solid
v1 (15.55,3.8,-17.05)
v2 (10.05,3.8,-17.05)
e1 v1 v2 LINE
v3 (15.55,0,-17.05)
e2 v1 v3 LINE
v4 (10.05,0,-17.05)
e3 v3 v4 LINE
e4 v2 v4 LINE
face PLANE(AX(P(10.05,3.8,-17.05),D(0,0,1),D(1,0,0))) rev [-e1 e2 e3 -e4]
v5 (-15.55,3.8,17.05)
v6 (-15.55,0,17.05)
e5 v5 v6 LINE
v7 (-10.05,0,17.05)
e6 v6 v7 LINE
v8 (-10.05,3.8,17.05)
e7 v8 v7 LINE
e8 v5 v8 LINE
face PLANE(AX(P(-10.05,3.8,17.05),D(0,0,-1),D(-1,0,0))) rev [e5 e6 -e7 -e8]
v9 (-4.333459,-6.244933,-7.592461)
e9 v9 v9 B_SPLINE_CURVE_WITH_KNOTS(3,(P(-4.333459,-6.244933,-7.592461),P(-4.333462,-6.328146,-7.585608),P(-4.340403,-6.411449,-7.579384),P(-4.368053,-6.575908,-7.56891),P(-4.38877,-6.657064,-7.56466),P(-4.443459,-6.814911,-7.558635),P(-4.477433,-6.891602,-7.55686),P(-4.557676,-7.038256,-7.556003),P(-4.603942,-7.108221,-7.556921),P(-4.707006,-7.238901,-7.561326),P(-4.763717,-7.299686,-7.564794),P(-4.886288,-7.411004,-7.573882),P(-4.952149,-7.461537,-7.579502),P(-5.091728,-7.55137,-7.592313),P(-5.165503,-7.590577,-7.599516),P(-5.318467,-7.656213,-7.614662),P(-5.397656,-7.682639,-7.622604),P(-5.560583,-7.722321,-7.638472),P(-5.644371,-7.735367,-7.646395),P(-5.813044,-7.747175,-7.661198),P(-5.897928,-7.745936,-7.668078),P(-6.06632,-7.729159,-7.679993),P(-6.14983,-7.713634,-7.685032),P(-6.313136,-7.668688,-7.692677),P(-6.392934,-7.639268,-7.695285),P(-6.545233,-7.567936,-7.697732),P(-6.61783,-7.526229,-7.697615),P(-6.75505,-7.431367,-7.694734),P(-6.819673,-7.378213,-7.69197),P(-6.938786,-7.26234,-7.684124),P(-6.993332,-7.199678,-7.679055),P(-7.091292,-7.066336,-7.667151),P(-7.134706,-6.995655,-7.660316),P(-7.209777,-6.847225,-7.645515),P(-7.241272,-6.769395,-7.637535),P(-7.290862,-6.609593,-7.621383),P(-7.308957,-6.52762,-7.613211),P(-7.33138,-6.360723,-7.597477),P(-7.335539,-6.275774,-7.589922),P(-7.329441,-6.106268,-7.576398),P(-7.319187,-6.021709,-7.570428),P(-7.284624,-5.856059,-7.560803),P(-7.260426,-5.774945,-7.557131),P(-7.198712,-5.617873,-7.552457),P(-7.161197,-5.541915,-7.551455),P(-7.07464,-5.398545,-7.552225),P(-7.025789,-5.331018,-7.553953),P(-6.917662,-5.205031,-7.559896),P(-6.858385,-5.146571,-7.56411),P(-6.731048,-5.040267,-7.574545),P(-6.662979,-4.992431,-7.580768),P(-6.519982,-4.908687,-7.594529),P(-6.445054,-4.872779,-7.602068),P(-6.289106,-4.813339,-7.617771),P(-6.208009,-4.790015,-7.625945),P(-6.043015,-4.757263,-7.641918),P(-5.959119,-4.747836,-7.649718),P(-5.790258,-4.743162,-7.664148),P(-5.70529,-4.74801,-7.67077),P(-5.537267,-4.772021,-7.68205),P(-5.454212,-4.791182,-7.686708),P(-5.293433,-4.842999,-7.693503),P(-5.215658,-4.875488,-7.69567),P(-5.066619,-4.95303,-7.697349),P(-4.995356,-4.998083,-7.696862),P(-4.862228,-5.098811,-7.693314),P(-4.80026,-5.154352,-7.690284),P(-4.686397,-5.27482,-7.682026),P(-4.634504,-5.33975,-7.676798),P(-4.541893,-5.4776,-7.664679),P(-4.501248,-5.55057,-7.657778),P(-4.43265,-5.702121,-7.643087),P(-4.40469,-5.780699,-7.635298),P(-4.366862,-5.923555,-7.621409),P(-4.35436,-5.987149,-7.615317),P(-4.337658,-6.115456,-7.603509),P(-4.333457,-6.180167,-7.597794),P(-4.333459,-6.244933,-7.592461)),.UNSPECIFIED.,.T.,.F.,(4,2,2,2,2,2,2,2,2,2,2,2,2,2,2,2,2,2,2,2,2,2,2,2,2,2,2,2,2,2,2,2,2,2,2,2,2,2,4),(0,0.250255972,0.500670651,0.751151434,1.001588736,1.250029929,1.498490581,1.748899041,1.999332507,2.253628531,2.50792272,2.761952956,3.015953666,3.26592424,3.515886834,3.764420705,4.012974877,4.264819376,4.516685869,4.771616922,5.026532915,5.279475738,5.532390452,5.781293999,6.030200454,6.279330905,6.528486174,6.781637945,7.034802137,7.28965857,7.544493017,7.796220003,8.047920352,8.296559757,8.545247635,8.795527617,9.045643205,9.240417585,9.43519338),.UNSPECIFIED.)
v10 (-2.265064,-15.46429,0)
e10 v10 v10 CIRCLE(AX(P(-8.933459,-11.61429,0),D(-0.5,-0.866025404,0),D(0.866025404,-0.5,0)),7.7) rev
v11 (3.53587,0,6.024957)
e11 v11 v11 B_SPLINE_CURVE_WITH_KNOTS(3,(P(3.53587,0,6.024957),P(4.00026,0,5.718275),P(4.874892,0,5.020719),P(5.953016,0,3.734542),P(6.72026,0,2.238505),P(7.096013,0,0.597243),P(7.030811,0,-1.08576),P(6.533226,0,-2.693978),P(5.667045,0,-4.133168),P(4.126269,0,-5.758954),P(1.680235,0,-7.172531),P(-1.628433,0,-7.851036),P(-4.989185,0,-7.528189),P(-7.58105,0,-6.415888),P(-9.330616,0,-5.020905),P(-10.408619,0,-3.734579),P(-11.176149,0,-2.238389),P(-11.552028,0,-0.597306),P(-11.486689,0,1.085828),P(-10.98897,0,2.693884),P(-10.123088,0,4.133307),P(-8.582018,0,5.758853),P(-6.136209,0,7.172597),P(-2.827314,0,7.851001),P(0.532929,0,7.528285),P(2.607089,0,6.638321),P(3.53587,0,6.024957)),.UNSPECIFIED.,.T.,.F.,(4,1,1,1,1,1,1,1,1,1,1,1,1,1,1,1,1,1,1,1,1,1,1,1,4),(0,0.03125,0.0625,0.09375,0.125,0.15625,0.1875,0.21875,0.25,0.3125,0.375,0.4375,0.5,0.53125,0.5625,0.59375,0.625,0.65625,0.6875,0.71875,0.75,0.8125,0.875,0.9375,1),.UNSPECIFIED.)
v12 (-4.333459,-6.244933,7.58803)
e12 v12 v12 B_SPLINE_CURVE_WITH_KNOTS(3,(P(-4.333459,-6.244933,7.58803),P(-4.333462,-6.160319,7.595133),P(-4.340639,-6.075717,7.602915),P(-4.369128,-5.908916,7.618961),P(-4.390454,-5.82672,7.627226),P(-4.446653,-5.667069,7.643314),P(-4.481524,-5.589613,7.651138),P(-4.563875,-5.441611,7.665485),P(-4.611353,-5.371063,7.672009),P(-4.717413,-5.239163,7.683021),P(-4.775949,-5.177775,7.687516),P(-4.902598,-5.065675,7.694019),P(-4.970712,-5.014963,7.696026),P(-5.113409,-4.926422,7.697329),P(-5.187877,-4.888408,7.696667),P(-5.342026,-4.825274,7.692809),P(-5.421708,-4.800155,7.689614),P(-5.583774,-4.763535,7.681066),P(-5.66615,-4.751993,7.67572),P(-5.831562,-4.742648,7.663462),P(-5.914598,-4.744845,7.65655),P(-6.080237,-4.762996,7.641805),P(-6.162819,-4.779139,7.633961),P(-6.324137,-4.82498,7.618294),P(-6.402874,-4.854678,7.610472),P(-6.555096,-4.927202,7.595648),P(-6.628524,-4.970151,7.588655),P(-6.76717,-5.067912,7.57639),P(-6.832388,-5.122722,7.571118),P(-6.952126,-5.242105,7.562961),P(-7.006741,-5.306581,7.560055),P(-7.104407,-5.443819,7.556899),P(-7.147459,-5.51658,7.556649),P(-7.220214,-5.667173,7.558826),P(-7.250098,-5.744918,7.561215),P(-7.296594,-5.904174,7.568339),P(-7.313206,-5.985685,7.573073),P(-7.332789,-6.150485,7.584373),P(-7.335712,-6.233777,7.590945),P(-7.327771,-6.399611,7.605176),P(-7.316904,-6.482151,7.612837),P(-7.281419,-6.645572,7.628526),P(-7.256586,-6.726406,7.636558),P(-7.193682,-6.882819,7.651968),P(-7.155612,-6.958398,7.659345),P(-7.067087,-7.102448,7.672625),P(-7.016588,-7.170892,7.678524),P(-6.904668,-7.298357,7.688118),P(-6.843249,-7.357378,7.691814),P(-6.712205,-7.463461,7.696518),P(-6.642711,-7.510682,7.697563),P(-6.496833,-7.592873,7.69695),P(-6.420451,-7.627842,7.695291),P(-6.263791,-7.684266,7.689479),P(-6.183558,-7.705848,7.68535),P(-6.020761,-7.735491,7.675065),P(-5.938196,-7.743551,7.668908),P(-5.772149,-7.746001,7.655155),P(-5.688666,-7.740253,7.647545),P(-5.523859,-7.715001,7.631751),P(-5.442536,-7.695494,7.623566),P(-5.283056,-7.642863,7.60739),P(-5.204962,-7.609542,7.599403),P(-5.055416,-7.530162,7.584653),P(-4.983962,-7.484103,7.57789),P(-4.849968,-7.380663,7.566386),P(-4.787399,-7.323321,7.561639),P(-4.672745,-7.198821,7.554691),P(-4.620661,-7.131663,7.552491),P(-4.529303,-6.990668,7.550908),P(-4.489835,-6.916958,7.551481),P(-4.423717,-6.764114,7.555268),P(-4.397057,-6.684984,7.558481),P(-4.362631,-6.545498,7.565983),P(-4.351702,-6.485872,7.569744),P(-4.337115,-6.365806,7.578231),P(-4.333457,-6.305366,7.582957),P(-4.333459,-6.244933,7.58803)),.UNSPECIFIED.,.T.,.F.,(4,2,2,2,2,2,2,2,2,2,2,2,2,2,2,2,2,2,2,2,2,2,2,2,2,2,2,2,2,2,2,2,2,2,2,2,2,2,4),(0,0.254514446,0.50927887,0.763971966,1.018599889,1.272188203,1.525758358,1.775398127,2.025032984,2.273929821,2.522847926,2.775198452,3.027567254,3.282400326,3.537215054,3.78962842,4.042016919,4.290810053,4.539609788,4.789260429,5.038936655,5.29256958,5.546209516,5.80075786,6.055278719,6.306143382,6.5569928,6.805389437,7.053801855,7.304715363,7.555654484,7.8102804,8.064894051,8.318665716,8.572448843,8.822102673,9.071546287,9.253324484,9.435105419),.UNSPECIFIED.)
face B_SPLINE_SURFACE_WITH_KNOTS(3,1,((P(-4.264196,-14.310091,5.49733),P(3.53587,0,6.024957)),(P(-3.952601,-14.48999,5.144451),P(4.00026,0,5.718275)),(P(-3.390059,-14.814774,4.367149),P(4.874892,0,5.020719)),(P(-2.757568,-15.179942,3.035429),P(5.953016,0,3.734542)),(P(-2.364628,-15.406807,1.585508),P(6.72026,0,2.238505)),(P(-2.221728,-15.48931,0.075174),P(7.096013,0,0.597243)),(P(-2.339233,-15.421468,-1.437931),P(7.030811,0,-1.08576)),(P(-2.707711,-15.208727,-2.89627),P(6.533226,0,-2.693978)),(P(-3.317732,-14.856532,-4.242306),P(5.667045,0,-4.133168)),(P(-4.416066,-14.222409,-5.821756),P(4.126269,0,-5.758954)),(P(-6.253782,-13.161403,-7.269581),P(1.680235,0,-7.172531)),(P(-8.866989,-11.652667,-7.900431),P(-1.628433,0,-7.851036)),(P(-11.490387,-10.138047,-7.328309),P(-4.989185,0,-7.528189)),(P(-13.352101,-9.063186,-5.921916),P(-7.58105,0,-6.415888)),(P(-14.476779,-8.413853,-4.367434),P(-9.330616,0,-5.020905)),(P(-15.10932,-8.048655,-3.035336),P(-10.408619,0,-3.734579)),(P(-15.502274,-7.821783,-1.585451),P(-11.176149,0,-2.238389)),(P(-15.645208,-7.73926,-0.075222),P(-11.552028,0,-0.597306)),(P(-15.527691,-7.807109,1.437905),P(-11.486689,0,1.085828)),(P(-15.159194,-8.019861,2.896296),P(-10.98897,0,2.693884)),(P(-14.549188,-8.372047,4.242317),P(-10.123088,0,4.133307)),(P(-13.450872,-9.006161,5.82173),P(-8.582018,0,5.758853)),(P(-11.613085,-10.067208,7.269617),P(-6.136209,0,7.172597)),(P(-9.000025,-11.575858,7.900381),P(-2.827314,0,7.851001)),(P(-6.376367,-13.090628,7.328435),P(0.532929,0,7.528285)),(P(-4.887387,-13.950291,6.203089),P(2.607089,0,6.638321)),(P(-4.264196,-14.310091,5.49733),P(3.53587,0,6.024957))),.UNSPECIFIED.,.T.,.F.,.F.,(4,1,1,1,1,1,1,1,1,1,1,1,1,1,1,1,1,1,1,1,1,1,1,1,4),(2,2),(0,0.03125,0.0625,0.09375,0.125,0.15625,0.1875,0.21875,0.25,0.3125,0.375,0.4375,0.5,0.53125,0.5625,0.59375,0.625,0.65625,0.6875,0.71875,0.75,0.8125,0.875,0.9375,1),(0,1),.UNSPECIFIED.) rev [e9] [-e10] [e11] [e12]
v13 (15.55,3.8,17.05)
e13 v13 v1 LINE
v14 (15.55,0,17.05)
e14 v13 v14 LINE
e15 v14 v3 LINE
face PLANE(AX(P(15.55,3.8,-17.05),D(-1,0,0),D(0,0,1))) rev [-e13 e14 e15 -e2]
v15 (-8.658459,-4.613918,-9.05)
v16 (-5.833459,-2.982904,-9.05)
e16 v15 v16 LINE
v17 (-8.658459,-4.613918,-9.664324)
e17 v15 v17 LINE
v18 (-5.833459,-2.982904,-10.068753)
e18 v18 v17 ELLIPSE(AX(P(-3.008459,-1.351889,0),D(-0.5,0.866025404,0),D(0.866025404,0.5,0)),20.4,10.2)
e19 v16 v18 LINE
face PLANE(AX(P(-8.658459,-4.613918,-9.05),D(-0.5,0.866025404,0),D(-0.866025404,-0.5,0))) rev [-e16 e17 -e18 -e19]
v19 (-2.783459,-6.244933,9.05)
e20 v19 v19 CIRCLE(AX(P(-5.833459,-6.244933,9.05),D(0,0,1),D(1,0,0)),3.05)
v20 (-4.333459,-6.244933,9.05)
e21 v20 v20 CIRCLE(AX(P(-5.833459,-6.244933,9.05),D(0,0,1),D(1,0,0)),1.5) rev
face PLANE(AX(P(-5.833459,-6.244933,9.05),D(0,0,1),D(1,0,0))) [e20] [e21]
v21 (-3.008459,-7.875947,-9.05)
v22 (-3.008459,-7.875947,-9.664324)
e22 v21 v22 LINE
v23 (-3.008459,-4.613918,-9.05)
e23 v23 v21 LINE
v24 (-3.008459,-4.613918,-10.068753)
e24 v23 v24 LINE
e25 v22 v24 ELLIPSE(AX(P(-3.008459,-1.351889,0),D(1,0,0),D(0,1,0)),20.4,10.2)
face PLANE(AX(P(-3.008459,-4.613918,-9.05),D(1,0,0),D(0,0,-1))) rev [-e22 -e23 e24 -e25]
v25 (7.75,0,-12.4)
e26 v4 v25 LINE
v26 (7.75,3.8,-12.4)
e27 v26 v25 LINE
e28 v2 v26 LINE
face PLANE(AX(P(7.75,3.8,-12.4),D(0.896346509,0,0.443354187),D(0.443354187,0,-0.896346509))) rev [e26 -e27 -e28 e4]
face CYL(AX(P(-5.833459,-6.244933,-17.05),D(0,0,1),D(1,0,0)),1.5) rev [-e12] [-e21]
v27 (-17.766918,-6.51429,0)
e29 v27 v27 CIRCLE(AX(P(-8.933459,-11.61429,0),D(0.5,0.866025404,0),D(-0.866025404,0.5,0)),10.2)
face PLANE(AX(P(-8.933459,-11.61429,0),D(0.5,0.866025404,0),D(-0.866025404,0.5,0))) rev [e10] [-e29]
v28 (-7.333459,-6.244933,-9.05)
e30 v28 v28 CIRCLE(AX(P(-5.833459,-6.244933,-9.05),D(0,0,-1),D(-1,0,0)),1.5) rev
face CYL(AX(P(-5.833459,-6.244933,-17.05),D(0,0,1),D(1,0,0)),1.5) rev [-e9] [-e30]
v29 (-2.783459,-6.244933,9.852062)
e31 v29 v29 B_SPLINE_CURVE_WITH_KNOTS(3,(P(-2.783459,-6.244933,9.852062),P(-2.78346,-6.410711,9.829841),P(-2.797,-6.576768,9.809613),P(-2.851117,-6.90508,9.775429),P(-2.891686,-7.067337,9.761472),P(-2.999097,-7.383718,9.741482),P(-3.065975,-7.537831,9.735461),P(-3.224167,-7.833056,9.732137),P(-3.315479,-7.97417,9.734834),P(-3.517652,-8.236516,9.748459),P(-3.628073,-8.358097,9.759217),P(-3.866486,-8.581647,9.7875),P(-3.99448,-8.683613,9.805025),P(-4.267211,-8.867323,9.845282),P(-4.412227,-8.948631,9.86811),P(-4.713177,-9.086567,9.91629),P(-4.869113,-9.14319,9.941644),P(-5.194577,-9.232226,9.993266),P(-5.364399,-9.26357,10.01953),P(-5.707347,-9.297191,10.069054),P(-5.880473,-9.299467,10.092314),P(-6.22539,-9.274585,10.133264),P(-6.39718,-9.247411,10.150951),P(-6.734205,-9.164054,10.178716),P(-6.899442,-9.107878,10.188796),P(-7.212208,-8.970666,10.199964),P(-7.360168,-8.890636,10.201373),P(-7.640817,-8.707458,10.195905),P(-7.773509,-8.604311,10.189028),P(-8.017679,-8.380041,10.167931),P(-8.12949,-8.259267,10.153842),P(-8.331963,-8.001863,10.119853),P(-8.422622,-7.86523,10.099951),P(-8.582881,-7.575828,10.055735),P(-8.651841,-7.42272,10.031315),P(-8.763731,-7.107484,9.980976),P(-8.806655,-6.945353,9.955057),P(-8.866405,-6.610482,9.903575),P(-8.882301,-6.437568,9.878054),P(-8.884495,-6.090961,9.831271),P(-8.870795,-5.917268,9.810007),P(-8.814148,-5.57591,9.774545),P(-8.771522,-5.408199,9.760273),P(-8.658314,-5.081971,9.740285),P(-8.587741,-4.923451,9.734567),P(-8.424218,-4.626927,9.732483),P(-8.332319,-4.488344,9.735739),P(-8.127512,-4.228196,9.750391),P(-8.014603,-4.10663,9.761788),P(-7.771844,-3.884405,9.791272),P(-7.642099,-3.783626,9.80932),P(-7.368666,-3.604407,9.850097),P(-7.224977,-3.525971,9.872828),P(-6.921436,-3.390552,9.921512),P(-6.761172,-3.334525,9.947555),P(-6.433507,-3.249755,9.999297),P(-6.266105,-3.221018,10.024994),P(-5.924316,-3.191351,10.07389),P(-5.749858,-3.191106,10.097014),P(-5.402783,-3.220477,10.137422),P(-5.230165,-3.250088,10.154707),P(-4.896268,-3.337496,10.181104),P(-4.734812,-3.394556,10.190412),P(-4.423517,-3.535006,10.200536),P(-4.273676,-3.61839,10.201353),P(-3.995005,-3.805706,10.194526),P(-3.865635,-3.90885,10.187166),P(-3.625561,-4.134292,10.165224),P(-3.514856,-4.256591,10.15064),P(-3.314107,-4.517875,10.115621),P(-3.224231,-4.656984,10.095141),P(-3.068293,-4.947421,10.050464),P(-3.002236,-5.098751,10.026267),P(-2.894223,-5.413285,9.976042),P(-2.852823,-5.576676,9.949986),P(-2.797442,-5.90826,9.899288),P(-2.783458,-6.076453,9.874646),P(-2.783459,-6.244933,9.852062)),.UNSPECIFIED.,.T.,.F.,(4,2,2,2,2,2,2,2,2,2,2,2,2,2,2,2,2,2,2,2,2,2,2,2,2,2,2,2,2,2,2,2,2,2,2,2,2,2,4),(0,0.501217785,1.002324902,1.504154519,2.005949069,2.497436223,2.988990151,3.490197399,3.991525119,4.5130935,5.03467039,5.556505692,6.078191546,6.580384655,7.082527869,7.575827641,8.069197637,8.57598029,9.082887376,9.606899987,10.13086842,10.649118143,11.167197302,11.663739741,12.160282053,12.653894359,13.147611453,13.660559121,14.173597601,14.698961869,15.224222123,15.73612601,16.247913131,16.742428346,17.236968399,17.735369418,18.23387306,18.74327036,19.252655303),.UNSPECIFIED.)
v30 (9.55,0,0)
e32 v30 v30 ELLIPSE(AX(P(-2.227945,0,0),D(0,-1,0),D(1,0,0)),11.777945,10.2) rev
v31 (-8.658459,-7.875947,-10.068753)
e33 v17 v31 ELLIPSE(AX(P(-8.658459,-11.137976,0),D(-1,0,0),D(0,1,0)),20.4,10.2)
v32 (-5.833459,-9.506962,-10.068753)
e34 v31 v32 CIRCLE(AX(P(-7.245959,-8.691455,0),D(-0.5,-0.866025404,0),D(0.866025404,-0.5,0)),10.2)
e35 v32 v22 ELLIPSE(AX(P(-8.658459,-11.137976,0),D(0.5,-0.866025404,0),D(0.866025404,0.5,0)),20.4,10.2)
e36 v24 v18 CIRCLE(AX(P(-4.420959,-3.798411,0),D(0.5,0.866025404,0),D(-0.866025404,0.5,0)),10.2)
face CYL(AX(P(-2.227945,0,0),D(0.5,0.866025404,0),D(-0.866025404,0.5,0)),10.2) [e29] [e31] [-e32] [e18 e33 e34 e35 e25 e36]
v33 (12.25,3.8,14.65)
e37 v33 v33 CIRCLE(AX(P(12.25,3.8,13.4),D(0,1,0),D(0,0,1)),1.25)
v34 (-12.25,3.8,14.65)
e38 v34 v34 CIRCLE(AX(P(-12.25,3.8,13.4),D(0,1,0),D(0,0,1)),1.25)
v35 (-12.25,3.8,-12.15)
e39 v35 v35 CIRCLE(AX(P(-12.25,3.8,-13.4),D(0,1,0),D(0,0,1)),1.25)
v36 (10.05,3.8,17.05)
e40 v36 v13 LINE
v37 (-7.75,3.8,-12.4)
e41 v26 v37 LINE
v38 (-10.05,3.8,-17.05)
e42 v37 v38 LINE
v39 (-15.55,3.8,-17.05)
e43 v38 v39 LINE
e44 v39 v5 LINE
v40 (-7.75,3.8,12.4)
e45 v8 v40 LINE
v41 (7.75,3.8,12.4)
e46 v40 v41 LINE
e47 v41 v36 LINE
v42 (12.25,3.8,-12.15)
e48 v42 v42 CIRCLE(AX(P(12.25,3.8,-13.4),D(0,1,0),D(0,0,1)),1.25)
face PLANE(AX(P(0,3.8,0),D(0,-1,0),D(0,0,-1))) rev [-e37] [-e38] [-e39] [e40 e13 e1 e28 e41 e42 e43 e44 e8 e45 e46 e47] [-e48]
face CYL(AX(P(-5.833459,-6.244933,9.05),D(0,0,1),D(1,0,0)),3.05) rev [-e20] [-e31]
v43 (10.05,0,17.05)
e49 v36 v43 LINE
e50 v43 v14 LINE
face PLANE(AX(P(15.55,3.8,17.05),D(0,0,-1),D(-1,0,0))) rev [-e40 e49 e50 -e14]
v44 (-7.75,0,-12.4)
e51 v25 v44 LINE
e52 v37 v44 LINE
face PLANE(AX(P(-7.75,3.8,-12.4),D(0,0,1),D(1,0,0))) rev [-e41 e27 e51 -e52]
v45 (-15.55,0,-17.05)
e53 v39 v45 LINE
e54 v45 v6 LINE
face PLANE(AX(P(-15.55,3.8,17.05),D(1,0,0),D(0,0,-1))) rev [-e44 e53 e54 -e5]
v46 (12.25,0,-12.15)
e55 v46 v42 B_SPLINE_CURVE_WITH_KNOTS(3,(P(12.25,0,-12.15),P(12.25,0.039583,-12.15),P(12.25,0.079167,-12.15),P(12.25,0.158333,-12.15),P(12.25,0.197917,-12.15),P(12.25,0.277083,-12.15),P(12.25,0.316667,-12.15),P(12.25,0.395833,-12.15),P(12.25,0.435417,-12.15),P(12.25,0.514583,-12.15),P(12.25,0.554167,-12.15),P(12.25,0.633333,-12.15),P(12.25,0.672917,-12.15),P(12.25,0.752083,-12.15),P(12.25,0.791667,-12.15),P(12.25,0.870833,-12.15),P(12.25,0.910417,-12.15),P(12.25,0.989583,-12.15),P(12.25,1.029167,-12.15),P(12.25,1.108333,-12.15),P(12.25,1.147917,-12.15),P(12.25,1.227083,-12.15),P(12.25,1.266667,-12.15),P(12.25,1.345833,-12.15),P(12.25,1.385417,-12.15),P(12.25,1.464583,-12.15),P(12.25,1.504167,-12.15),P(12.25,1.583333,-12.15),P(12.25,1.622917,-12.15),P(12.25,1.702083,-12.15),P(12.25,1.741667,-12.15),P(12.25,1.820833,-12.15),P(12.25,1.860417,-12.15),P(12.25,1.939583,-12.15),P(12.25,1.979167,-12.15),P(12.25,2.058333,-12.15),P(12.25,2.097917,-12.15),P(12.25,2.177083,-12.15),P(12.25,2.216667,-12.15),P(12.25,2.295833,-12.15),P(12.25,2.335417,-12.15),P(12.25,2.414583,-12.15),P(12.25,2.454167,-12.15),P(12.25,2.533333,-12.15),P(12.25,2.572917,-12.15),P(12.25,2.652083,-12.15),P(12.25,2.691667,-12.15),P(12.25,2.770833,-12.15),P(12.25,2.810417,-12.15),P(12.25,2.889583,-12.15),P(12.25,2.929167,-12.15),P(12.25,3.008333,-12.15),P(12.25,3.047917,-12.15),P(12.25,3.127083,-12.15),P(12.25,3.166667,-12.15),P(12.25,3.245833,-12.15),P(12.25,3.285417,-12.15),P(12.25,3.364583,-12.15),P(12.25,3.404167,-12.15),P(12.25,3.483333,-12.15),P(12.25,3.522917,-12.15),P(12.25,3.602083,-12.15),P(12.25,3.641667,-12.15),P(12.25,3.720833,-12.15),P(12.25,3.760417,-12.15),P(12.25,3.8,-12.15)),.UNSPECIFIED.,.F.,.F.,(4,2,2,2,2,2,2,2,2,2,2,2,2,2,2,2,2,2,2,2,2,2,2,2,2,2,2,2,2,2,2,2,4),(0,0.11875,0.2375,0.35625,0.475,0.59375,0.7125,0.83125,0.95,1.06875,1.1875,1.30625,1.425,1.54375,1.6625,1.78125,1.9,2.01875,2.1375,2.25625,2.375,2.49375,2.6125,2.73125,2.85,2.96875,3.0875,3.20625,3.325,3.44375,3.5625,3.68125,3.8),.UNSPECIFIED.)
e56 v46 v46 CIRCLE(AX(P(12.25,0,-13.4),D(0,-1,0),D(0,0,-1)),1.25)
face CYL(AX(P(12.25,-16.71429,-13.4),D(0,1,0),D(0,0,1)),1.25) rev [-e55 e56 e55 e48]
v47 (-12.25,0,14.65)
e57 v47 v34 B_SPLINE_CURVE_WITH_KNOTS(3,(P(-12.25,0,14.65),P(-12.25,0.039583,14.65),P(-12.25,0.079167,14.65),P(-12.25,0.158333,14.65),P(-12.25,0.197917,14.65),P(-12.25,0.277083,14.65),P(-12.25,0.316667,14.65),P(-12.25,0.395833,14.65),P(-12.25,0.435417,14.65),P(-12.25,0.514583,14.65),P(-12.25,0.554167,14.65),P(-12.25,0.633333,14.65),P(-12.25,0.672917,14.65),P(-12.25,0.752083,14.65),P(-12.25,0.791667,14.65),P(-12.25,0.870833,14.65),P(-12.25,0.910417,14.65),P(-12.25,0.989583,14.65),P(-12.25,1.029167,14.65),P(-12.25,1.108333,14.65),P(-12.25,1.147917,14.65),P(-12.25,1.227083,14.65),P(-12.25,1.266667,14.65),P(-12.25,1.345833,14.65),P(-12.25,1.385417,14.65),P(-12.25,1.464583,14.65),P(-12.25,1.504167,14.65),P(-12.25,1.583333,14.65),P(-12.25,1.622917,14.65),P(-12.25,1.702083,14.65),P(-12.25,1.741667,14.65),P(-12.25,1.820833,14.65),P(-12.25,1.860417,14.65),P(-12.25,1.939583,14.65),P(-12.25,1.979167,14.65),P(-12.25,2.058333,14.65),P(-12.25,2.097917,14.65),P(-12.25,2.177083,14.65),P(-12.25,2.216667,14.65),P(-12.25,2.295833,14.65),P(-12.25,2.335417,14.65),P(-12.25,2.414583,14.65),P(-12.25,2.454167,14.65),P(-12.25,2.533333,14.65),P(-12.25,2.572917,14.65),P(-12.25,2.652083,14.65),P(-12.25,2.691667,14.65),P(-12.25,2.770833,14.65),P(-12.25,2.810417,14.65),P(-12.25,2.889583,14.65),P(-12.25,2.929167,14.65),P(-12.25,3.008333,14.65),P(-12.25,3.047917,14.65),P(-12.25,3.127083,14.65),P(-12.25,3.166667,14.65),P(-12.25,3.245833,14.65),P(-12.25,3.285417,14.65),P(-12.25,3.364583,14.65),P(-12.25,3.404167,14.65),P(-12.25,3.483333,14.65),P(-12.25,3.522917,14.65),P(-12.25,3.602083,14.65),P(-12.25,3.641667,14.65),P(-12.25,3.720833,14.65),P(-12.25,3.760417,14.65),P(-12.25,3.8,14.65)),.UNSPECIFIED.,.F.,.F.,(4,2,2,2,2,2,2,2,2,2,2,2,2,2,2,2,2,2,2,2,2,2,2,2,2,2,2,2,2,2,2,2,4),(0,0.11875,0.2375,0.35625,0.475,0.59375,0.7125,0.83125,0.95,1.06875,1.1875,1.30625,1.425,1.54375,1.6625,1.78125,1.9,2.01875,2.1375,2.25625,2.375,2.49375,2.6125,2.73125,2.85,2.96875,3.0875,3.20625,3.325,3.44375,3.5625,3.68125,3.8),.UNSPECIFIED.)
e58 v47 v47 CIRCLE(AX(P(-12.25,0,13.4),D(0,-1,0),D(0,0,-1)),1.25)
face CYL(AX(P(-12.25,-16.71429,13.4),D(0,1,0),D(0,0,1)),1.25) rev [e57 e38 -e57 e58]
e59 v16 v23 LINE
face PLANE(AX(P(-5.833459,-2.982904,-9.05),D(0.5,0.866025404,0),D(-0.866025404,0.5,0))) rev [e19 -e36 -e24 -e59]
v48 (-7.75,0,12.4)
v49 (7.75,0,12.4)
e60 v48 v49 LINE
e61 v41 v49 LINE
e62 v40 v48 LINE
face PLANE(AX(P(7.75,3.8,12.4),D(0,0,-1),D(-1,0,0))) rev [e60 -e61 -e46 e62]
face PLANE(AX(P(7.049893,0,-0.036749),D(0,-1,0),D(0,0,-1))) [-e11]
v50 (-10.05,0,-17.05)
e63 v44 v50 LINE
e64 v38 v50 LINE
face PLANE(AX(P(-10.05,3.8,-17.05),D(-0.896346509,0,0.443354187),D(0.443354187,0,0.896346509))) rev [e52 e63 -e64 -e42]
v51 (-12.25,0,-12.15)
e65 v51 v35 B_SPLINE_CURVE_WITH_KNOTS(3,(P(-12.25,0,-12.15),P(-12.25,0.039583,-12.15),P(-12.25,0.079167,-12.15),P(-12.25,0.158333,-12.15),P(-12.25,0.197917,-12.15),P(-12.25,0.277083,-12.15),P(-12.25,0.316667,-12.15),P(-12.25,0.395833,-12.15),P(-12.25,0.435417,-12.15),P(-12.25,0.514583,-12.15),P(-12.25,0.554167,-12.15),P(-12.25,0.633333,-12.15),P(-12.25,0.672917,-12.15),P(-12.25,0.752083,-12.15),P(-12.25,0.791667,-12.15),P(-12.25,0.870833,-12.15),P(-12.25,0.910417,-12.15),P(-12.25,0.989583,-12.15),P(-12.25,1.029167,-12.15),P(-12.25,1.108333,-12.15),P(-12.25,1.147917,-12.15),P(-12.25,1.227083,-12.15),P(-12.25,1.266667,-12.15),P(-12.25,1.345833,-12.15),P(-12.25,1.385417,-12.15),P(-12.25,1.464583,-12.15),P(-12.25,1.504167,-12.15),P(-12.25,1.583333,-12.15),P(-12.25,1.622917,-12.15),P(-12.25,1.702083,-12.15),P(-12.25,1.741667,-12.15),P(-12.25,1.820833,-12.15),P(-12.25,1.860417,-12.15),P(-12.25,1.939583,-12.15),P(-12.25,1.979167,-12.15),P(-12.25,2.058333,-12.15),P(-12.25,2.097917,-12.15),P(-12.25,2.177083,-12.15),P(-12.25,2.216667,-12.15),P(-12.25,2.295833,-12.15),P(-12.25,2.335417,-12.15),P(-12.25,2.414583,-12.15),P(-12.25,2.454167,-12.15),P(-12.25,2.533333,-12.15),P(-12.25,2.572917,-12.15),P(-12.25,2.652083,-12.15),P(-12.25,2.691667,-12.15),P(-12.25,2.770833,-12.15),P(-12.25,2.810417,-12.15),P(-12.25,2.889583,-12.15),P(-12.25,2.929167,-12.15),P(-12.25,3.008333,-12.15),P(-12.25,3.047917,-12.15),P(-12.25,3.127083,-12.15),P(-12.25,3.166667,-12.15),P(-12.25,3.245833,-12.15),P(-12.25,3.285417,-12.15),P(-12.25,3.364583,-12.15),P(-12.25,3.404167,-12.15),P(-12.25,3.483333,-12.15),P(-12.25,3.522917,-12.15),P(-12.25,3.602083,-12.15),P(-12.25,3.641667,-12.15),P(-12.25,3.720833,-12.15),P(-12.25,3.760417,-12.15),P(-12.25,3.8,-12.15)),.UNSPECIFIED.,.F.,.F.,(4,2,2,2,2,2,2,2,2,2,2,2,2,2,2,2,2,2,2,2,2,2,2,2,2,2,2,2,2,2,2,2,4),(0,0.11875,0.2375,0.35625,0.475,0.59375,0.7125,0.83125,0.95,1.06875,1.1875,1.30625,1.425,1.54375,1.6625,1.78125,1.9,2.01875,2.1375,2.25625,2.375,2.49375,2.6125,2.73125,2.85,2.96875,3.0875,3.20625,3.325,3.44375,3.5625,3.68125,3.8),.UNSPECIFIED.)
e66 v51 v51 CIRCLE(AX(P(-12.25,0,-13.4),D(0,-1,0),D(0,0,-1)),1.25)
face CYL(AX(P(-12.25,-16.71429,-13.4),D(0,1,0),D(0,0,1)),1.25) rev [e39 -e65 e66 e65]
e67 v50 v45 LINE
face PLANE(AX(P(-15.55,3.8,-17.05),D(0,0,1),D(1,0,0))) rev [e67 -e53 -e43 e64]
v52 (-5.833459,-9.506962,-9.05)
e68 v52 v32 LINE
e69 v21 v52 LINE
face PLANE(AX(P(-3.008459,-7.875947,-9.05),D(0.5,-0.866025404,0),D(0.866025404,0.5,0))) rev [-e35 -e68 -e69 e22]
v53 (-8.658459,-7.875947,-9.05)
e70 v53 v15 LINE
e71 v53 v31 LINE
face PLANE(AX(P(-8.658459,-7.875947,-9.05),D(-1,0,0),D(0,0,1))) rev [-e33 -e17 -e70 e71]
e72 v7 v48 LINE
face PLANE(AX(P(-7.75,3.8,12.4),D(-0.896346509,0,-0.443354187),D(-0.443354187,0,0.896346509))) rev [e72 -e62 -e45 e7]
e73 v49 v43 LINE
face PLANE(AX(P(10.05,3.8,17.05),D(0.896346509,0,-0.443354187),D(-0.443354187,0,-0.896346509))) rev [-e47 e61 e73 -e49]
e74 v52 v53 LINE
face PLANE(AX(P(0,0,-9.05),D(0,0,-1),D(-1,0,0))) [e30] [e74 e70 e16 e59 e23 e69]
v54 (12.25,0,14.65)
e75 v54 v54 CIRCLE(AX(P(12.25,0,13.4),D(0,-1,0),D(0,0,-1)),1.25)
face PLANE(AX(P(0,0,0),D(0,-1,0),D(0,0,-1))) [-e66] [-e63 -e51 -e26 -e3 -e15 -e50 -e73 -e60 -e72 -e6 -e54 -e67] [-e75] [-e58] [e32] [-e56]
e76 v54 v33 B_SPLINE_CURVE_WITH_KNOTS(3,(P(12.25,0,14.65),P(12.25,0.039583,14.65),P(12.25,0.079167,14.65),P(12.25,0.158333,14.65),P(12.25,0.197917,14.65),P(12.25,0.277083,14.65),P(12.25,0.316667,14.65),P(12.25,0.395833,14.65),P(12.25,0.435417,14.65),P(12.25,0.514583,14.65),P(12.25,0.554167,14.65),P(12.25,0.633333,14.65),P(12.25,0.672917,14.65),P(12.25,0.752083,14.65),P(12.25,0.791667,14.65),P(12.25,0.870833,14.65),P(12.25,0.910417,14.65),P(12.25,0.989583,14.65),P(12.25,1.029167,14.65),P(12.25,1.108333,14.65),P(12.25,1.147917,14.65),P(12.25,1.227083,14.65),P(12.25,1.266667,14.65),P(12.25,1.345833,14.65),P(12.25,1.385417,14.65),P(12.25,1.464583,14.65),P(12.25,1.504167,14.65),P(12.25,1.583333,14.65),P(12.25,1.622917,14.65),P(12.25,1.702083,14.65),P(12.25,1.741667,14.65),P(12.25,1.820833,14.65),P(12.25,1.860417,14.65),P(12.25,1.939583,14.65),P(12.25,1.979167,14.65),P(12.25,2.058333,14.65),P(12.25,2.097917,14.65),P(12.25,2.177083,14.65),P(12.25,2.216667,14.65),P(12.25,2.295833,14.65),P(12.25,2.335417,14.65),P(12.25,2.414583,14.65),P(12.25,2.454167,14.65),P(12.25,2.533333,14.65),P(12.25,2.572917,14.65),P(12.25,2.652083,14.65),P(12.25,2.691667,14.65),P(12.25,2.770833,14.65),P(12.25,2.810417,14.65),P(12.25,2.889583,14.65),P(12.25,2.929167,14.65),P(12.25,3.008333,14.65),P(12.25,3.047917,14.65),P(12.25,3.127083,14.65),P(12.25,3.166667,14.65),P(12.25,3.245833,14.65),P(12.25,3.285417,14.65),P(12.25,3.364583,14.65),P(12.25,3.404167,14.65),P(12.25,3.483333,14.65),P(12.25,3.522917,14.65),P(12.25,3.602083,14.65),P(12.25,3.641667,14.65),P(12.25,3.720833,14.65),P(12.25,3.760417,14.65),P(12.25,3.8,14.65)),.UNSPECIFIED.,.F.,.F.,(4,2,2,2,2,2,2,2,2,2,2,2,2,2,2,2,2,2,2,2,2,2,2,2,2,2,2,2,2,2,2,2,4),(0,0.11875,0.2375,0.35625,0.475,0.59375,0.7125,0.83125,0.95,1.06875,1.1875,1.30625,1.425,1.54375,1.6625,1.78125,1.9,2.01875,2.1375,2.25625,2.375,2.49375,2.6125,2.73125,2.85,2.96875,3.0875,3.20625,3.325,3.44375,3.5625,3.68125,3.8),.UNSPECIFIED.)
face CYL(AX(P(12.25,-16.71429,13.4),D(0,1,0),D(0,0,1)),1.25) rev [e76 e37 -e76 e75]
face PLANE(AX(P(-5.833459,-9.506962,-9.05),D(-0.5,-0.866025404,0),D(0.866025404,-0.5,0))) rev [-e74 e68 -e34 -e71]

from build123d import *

# Parameters (mm, degrees)
BOSS_EXTRUDE1_DEPTH     = 3.8
CUT_EXTRUDE1_DEPTH      = 33.04999228
CUT_EXTRUDE2_DEPTH      = 30.761273573
CUT_EXTRUDE2_DEPTH_BACK = 30.761273573
SKETCH7_R               = 1.5
CUT_EXTRUDE3_DEPTH      = 8
SKETCH9_R               = 3.05
CUT_EXTRUDE4_DEPTH      = 8
SKETCH10_R              = 1.25
CUT_EXTRUDE5_DEPTH      = 33.0499924


with BuildPart() as part:
    # Sketch1 → Boss-Extrude1 (new body)
    with BuildSketch(Plane(origin=(0, 0, 0), x_dir=(1, 0, 0), z_dir=(0, 1, 0))):
        Polygon((-15.55, -17.05), (-15.55, 17.05), (-10.05, 17.05), (-7.75, 12.4), (7.75, 12.4), (10.05, 17.05), (15.55, 17.05), (15.55, -17.05), (10.05, -17.05), (7.75, -12.4), (-7.75, -12.4), (-10.05, -17.05), align=None)
    extrude(amount=BOSS_EXTRUDE1_DEPTH)

    # Revolve1: read off the stored shape, not the designer's step
    # Revolve1 outline → Revolve1 (revolve)
    with BuildSketch(Plane(origin=(-1.670959119, 0.964728697, 0), x_dir=(0.8660254037844398, -0.499999999999998, 0), z_dir=(0, 0, 1))):
        Polygon((10.200000298, -14.525), (10.200000248, 4.775000143), (3.79917118, 1.079479758), (0, 1.079479758), (0, -14.525), align=None)
    revolve(axis=Axis((-1.670959119, 0.964728697, 0), (0.499999999999998, 0.8660254037844398, 0)))

    # Sketch3 → Cut-Extrude1 (cut, through all)
    with BuildSketch(Plane(origin=(0, 3.8, 0), x_dir=(1, 0, 0), z_dir=(0, 1, 0))):
        Polygon((-10.05, 17.05), (-15.55, 17.05), (-15.55, -17.05), (-10.05, -17.05), (-7.75, -12.4), (7.75, -12.4), (10.05, -17.05), (15.55, -17.05), (15.55, 17.05), (10.05, 17.05), (7.75, 12.4), (-7.75, 12.4), align=None)
    extrude(amount=CUT_EXTRUDE1_DEPTH, mode=Mode.SUBTRACT)

    # Boundary-Cut1: read off the stored shape, not the designer's step
    # Boundary-Cut1: loft between two sections, ruled curve by curve
    boundary_cut1_from = [
        Edge.make_bspline([(-4.264195988, -14.310090618, 5.497330482), (-3.952600534, -14.489990338, 5.144451044), (-3.390059189, -14.814773735, 4.367149183), (-2.757568421, -15.17994245, 3.035429027), (-2.364627971, -15.406806725, 1.585508103), (-2.221728438, -15.489309808, 0.075173566), (-2.339233368, -15.421468305, -1.437931316), (-2.707711497, -15.208727358, -2.896270105), (-3.317731561, -14.85653211, -4.242306363), (-4.416065853, -14.222408511, -5.821756357), (-6.253782159, -13.161402507, -7.269581365), (-8.866989476, -11.652666559, -7.900430754), (-11.490387225, -10.138047163, -7.328308667), (-13.35210057, -9.063186462, -5.921916444), (-14.476778582, -8.413853309, -4.367433824), (-15.10932004, -8.048655327, -3.03533591), (-15.50227373, -7.821783409, -1.585450518), (-15.645207871, -7.739260344, -0.075222081), (-15.527690686, -7.807108923, 1.437904969), (-15.159193701, -8.019860756, 2.896296072), (-14.549188448, -8.372047453, 4.242316671), (-13.450871673, -9.006160938, 5.821729516), (-11.613084746, -10.067207715, 7.269617015), (-9.000025494, -11.575858178, 7.900380651), (-6.376366965, -13.090628136, 7.328435161), (-4.887386896, -13.95029118, 6.203089356), (-4.264195988, -14.310090618, 5.497330482)], [0, 0, 0, 0, 0.03125, 0.0625, 0.09375, 0.125, 0.15625, 0.1875, 0.21875, 0.25, 0.3125, 0.375, 0.4375, 0.5, 0.53125, 0.5625, 0.59375, 0.625, 0.65625, 0.6875, 0.71875, 0.75, 0.8125, 0.875, 0.9375, 1, 1, 1, 1], 3),
    ]
    boundary_cut1_to = [
        Edge.make_bspline([(3.535869827, 0, 6.0249567), (4.000260434, 0, 5.71827451), (4.874892388, 0, 5.020718912), (5.953015986, 0, 3.734542034), (6.720260155, 0, 2.238505144), (7.096013388, 0, 0.597243156), (7.030810986, 0, -1.085759731), (6.533226027, 0, -2.693977998), (5.66704479, 0, -4.133167867), (4.126269006, 0, -5.75895362), (1.680235047, 0, -7.172531093), (-1.628432874, 0, -7.851036071), (-4.989185483, 0, -7.528189152), (-7.581050356, 0, -6.415888298), (-9.330615811, 0, -5.020904789), (-10.408619135, 0, -3.734578971), (-11.176149314, 0, -2.238388975), (-11.55202821, 0, -0.597306131), (-11.48668895, 0, 1.0858282), (-10.988969574, 0, 2.693884042), (-10.123088416, 0, 4.133306502), (-8.582018083, 0, 5.758852747), (-6.136208886, 0, 7.172596545), (-2.827313809, 0, 7.85100057), (0.53292915, 0, 7.528284962), (2.607088614, 0, 6.63832108), (3.535869827, 0, 6.0249567)], [0, 0, 0, 0, 0.03125, 0.0625, 0.09375, 0.125, 0.15625, 0.1875, 0.21875, 0.25, 0.3125, 0.375, 0.4375, 0.5, 0.53125, 0.5625, 0.59375, 0.625, 0.65625, 0.6875, 0.71875, 0.75, 0.8125, 0.875, 0.9375, 1, 1, 1, 1], 3),
    ]
    boundary_cut1 = Solid(Shell([*[Face.make_surface_from_curves(boundary_cut1_from[k], boundary_cut1_to[k]) for k in range(1)], Face(Wire(boundary_cut1_from)), Face(Wire(boundary_cut1_to))]))
    add(boundary_cut1, mode=Mode.SUBTRACT)

    # Sketch7 → Cut-Extrude2 (cut, two sides: drawn at the far end of the back side and taken through both)
    with BuildSketch(Plane.XY.offset(-CUT_EXTRUDE2_DEPTH_BACK)):
        with Locations((-5.833459119, -6.24493279)):
            Circle(SKETCH7_R)
    extrude(amount=CUT_EXTRUDE2_DEPTH + CUT_EXTRUDE2_DEPTH_BACK, mode=Mode.SUBTRACT)

    # Sketch8 → Cut-Extrude3 (cut)
    with BuildSketch(Plane(origin=(0, 0, -17.05), x_dir=(-1, 0, 0), z_dir=(0, 0, -1))):
        Polygon((8.658459119, -4.613918279), (5.833459119, -2.982903769), (3.008459119, -4.613918279), (3.008459119, -7.8759473), (5.833459119, -9.50696181), (8.658459119, -7.8759473), align=None)
    extrude(amount=-CUT_EXTRUDE3_DEPTH, mode=Mode.SUBTRACT)

    # Sketch9 → Cut-Extrude4 (cut)
    with BuildSketch(Plane.XY.offset(17.05)):
        with Locations((-5.833459119, -6.24493279)):
            Circle(SKETCH9_R)
    extrude(amount=-CUT_EXTRUDE4_DEPTH, mode=Mode.SUBTRACT)

    # Sketch10 → Cut-Extrude5 (cut, through all)
    with BuildSketch(Plane(origin=(0, 3.8, 0), x_dir=(1, 0, 0), z_dir=(0, 1, 0))):
        with Locations(Location((-12.25, 13.4, 0), (0, 0, 270))):
            Circle(SKETCH10_R)
        with Locations(Location((-12.25, -13.4, 0), (0, 0, 270))):
            Circle(SKETCH10_R)
        with Locations(Location((12.25, -13.4, 0), (0, 0, 270))):
            Circle(SKETCH10_R)
        with Locations(Location((12.25, 13.4, 0), (0, 0, 270))):
            Circle(SKETCH10_R)
    extrude(amount=-CUT_EXTRUDE5_DEPTH, mode=Mode.SUBTRACT)


solid = part.part
